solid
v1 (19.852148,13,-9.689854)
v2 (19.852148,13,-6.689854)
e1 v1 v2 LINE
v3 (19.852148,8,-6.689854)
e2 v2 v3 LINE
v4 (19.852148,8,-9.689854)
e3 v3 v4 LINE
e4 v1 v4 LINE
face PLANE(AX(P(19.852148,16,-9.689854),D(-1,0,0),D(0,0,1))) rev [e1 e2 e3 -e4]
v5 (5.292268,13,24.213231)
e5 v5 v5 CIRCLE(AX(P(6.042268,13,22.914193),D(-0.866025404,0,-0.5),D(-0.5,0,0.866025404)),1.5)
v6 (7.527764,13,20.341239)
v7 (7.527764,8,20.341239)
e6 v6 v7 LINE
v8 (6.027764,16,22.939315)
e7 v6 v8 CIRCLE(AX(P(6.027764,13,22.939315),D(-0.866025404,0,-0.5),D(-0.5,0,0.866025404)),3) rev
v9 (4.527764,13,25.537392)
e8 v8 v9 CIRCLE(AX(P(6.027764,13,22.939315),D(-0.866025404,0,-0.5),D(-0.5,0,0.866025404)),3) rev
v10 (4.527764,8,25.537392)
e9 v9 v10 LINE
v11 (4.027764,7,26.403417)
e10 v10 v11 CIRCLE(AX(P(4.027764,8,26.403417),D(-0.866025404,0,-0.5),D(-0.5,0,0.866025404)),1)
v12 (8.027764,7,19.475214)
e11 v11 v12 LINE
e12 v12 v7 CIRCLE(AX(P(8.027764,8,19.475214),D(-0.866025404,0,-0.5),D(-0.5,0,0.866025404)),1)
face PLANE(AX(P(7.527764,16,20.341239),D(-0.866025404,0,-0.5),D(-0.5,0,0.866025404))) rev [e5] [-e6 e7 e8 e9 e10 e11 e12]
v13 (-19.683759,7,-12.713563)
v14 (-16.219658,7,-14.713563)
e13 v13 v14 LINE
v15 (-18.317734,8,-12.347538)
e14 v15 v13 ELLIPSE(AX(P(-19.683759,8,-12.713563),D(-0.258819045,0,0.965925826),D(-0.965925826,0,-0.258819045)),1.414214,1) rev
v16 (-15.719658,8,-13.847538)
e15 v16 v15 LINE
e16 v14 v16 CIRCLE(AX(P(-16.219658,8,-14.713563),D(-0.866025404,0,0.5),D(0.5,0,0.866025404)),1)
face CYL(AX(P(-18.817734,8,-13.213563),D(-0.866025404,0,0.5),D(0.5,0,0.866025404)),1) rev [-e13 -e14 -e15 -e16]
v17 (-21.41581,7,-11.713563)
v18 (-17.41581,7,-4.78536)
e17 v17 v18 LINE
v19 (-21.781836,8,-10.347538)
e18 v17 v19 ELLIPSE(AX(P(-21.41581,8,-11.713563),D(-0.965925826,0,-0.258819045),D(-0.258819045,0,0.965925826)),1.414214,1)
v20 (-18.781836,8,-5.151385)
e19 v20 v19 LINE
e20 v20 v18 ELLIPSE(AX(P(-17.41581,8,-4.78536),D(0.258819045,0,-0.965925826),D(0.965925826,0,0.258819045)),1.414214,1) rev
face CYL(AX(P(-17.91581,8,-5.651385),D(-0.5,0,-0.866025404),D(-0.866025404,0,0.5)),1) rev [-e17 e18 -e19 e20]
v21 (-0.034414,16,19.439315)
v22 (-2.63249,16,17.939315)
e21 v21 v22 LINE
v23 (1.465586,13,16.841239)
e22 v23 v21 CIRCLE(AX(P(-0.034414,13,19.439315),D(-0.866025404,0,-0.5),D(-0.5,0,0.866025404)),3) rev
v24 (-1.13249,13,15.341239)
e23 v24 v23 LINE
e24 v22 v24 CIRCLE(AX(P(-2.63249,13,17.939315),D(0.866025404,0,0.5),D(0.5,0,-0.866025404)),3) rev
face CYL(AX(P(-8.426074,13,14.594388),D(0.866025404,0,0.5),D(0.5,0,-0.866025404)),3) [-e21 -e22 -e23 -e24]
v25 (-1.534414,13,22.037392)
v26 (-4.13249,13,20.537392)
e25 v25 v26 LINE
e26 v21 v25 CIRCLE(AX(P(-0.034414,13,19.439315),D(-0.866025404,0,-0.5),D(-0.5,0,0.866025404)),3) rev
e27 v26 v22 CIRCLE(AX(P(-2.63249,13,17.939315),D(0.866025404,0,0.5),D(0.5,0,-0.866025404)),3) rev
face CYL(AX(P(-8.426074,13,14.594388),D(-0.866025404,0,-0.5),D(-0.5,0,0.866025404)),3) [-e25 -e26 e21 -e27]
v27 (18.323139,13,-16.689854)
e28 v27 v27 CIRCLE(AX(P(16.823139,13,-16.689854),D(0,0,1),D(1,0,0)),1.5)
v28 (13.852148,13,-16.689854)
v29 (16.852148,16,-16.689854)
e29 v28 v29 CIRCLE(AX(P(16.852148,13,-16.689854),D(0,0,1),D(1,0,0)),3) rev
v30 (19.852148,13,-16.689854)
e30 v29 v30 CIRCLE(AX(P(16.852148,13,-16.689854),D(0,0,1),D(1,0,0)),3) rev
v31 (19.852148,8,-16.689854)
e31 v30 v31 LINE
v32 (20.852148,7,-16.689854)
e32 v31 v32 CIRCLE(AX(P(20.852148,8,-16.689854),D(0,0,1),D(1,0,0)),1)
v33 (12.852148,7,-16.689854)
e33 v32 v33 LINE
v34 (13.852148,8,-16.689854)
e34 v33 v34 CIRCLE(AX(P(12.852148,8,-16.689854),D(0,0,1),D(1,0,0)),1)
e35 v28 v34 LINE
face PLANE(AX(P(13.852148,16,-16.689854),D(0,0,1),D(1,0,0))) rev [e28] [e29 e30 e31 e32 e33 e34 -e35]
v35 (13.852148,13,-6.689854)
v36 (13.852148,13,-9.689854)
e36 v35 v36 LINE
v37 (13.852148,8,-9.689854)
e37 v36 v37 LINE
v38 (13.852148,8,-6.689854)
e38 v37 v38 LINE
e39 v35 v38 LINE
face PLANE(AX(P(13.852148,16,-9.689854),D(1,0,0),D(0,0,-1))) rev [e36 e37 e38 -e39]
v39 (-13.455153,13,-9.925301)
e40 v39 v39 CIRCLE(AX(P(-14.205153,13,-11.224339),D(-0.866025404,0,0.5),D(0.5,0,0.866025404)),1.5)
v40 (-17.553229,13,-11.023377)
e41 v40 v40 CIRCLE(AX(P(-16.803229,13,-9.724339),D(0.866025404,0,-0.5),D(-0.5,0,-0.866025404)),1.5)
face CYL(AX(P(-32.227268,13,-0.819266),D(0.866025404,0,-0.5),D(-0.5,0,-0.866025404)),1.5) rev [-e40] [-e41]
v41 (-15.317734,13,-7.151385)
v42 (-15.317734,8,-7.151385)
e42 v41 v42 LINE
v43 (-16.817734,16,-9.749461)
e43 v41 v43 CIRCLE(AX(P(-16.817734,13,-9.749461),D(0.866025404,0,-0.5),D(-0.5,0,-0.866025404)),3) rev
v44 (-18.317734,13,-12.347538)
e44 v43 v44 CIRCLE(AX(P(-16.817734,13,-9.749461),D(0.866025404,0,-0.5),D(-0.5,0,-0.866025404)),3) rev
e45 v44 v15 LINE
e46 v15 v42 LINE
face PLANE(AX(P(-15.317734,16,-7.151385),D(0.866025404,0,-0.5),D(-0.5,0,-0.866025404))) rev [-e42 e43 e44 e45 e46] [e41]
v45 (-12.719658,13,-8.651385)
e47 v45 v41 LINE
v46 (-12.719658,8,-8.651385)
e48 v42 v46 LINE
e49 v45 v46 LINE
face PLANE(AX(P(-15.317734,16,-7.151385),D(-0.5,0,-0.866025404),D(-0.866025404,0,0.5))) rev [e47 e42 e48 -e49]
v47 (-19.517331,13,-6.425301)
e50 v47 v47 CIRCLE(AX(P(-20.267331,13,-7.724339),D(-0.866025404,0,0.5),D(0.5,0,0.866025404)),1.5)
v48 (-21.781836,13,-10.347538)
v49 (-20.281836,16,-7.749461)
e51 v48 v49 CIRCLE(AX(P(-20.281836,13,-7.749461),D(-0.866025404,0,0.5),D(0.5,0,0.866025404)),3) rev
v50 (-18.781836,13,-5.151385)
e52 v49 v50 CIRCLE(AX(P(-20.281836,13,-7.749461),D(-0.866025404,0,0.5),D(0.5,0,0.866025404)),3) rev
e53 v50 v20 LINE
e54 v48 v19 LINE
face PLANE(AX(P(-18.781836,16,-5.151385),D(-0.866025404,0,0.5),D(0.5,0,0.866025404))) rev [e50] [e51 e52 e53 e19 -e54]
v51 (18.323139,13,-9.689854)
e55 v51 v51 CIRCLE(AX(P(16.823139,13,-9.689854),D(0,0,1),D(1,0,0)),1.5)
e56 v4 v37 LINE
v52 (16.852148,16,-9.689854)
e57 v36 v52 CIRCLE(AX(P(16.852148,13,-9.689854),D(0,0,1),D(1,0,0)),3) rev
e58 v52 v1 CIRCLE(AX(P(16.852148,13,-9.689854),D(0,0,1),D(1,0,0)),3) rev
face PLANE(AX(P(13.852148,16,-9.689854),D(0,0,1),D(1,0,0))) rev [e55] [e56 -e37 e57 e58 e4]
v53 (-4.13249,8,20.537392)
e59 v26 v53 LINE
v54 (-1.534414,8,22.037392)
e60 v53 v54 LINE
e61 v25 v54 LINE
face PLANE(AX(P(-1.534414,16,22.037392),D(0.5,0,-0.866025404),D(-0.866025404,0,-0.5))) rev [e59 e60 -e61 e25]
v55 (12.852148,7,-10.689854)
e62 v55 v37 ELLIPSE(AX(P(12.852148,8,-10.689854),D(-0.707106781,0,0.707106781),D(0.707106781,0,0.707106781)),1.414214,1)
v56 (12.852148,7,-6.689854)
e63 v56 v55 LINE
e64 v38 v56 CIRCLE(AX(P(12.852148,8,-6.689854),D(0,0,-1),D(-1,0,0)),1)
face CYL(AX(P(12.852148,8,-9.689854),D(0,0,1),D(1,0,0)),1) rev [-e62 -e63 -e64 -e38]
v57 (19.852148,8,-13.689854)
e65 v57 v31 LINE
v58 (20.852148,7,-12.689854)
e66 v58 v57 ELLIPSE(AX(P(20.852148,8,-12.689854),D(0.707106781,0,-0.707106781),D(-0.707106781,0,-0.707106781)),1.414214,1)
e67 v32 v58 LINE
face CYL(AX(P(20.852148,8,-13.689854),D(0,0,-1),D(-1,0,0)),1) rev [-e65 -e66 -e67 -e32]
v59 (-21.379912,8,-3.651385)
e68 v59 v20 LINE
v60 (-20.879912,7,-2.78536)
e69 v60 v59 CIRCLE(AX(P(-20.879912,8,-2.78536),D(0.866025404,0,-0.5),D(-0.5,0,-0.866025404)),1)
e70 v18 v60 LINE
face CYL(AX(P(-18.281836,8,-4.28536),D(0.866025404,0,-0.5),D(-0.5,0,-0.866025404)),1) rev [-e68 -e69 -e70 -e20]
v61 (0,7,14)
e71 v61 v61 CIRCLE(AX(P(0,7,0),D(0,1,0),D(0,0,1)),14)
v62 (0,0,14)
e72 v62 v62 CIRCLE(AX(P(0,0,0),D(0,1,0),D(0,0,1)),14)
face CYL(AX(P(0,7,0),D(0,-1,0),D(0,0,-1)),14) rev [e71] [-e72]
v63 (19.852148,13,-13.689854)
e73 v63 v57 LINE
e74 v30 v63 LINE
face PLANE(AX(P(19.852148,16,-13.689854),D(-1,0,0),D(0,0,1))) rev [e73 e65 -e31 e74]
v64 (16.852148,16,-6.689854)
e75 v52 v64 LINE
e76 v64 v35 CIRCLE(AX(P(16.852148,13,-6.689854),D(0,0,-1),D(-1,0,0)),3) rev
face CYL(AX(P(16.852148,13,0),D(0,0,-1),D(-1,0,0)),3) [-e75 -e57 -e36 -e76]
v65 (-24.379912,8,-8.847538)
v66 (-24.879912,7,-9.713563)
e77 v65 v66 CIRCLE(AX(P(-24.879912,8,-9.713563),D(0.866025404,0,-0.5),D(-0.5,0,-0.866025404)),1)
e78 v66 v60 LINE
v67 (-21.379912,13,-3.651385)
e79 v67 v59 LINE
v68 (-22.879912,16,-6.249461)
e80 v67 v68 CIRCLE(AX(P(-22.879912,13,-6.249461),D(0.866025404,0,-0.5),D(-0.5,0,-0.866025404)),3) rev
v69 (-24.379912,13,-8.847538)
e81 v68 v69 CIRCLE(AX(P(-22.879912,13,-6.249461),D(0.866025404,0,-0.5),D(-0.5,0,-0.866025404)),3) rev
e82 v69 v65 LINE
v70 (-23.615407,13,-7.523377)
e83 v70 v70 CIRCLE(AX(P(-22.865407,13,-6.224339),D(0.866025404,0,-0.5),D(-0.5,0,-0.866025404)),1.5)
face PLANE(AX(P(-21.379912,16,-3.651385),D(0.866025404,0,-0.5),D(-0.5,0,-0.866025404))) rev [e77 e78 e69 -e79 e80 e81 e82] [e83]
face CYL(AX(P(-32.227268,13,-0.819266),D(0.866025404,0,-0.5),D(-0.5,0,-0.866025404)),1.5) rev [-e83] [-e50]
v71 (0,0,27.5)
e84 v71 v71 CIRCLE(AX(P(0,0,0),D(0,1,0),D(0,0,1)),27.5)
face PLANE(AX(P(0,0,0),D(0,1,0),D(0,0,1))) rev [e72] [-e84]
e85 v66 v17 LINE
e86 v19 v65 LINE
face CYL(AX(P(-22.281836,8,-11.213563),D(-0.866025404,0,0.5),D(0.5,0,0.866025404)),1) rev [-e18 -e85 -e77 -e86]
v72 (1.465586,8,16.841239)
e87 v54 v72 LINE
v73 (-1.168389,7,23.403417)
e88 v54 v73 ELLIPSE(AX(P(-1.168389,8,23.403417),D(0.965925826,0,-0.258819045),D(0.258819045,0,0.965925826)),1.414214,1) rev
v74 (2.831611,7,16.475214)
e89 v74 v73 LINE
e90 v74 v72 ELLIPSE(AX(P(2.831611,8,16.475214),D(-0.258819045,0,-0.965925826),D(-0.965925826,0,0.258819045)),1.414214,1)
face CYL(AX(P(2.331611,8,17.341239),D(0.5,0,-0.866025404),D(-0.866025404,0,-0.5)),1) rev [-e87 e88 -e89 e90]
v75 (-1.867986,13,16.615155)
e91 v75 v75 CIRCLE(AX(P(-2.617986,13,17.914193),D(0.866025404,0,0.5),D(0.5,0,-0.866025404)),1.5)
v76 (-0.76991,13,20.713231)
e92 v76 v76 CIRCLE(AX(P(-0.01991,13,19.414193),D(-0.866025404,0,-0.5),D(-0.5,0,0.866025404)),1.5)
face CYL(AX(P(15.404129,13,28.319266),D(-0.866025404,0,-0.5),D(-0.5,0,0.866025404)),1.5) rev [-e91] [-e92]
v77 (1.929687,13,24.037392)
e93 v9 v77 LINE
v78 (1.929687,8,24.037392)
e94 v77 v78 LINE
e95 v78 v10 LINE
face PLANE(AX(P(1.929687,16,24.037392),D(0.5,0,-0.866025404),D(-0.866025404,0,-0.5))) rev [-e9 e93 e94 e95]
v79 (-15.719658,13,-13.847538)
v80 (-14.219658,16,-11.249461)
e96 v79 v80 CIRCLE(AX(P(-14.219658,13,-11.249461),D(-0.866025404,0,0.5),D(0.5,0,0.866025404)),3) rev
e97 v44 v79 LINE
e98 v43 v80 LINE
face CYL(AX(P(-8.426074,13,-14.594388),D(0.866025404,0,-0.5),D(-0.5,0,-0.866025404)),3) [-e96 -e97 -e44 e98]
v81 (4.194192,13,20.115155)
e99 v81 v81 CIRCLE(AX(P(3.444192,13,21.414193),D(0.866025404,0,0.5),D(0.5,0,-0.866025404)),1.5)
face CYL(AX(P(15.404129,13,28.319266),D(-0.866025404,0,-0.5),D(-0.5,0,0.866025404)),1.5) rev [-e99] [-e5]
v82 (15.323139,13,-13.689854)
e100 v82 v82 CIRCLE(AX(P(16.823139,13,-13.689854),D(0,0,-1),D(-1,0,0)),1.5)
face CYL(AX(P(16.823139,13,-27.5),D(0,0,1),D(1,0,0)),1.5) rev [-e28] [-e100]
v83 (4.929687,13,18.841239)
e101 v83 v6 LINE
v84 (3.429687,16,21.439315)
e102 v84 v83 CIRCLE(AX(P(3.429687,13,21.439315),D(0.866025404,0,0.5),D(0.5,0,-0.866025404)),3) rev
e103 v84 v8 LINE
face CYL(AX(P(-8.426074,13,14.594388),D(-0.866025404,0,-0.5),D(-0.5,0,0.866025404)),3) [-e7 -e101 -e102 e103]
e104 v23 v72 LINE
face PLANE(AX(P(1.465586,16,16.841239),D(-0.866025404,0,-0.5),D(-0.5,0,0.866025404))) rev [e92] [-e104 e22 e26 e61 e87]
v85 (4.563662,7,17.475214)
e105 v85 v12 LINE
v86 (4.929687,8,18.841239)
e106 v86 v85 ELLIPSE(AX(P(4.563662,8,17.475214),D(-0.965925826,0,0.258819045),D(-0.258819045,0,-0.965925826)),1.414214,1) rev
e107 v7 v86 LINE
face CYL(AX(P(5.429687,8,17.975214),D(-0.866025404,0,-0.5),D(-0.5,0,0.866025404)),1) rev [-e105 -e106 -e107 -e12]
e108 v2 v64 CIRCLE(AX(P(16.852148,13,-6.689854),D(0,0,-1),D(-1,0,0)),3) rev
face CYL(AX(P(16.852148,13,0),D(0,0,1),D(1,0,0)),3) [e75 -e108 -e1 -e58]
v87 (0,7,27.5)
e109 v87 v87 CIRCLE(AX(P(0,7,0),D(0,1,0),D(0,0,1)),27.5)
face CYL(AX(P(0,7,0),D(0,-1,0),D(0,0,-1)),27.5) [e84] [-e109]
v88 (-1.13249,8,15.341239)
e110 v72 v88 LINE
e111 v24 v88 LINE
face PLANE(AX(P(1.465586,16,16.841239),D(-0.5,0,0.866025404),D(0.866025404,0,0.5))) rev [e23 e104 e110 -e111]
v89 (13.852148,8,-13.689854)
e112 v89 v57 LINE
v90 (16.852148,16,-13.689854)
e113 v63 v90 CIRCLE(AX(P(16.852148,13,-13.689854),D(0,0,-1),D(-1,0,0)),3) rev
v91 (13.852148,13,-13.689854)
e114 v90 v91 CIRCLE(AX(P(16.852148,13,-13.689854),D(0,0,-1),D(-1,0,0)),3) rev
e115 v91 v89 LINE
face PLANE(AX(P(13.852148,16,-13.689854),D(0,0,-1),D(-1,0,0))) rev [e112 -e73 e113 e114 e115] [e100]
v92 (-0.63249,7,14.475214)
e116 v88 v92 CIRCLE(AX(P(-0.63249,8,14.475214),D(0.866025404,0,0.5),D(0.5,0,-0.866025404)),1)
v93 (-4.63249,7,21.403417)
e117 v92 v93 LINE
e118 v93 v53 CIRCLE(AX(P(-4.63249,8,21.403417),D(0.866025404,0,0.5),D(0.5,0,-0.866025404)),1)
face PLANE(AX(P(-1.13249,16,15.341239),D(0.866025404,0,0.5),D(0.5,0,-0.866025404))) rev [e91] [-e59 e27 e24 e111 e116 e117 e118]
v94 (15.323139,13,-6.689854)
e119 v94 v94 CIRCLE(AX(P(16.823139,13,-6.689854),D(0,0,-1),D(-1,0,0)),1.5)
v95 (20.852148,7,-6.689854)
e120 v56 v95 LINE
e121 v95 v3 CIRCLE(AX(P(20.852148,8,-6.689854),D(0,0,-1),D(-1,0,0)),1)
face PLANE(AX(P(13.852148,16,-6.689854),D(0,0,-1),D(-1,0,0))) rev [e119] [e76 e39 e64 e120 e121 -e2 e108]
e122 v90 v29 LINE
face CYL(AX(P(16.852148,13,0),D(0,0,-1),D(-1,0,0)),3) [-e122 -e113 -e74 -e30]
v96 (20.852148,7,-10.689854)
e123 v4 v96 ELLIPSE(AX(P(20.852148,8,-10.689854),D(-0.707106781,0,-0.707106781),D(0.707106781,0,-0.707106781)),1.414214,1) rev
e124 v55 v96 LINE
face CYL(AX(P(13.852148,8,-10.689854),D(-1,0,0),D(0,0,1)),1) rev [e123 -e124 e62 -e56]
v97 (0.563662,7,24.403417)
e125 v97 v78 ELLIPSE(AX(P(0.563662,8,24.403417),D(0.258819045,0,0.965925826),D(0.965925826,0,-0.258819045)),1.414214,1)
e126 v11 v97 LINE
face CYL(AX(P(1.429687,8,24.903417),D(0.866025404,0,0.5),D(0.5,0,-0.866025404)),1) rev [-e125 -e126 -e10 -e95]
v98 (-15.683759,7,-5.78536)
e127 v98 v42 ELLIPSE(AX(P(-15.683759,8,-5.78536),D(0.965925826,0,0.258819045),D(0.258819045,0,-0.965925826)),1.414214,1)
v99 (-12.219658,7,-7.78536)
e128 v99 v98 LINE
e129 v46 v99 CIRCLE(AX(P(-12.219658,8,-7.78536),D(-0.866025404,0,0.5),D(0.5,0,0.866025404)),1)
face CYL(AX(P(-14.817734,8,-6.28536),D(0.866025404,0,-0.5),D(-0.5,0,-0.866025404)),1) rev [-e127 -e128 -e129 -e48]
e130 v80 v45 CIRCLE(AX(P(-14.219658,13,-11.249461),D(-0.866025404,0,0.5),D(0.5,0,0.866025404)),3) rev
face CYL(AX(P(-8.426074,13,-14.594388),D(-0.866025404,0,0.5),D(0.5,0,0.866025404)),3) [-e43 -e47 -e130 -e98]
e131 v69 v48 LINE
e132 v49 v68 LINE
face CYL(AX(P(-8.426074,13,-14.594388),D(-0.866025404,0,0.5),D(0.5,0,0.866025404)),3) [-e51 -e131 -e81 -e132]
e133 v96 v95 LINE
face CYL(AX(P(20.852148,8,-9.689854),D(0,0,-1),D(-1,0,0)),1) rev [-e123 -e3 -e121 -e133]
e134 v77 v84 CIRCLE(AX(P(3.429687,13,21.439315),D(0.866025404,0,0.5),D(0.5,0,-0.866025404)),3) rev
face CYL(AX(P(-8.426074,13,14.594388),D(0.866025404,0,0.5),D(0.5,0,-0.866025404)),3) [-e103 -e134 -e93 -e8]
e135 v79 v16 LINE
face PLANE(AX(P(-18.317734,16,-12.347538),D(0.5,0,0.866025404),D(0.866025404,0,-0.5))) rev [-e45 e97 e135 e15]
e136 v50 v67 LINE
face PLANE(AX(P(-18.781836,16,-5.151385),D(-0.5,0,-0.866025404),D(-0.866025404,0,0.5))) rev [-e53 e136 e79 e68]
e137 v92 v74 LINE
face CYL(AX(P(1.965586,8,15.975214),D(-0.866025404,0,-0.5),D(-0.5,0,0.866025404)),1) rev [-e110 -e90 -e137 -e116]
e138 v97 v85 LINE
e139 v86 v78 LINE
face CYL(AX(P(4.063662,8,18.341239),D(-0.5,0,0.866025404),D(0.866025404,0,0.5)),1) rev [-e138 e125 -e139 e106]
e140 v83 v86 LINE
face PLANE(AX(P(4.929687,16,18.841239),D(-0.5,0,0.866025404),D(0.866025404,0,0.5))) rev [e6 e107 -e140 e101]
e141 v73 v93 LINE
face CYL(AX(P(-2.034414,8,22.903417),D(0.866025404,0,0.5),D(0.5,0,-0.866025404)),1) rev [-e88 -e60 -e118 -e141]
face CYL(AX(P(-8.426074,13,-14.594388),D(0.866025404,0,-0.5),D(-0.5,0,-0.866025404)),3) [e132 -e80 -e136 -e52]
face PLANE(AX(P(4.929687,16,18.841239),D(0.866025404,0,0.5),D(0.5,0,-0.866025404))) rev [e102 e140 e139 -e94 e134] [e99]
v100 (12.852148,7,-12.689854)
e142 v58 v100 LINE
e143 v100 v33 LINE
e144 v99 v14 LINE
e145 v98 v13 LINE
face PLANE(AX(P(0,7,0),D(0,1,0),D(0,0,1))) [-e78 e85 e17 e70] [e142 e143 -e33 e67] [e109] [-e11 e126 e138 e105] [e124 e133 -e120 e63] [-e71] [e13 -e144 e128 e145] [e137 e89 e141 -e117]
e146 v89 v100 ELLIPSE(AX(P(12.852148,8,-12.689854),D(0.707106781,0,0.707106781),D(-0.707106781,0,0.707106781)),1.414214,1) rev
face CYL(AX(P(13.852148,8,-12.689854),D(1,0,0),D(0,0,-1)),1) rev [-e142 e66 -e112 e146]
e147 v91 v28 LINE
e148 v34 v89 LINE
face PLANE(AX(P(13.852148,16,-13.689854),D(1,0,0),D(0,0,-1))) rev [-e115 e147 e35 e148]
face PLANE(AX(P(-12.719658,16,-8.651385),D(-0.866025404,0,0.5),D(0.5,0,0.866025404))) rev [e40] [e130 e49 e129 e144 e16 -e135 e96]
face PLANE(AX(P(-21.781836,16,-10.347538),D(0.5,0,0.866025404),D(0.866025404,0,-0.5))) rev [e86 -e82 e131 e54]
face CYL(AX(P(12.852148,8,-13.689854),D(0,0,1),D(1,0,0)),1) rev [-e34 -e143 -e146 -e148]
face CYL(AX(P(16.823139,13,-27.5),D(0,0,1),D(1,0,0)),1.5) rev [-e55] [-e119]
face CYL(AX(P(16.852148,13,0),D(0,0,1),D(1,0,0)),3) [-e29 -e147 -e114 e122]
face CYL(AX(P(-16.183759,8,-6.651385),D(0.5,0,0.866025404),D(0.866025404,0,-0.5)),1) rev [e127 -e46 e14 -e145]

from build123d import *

# Parameters (mm, degrees)
SKETCH1_R                = 27.5
SKETCH1_R_2              = 14
BOSS_EXTRUDE1_DEPTH      = 7
SKETCH3_W                = 6
SKETCH3_H                = 3
BOSS_EXTRUDE2_DEPTH      = 9
FILLET1_R                = 3
FILLET2_R                = 1
SKETCH5_R                = 1.5
CUT_EXTRUDE2_DEPTH       = 47.703277471
CIRPATTERN2_COUNT        = 3
FILLET1_OF_CIRPATTERN2_R = 3
FILLET2_OF_CIRPATTERN2_R = 1


with BuildPart() as part:
    # Sketch1 → Boss-Extrude1 (new body)
    with BuildSketch(Plane(origin=(0, 0, 0), x_dir=(1, 0, 0), z_dir=(0, 1, 0))):
        with Locations(Location((0, 0, 0), (0, 0, 270))):
            Circle(SKETCH1_R)
        with Locations(Location((0, 0, 0), (0, 0, 270))):
            Circle(SKETCH1_R_2, mode=Mode.SUBTRACT)
    extrude(amount=BOSS_EXTRUDE1_DEPTH)

    # Sketch3 → Boss-Extrude2 (add)
    with BuildSketch(Plane(origin=(0, 7, 0), x_dir=(1, 0, 0), z_dir=(0, 1, 0))):
        with Locations((16.852148123, 8.189854147)):
            Rectangle(SKETCH3_W, SKETCH3_H)
        with Locations((16.852148123, 15.189854147)):
            Rectangle(SKETCH3_W, SKETCH3_H)
    boss_extrude2 = extrude(amount=BOSS_EXTRUDE2_DEPTH)

    # Fillet1
    fillet1_edges = [part.edges().sort_by_distance(p)[0] for p in [
        (19.852148123, 16, -8.189854147),
        (13.852148123, 16, -8.189854147),
        (13.852148123, 16, -15.189854147),
        (19.852148123, 16, -15.189854147),
    ]]
    fillet(fillet1_edges, radius=FILLET1_R - 0.0001)  # a hair under: the kernel refuses the full size

    # Fillet2
    fillet2_edges = [part.edges().sort_by_distance(p)[0] for p in [
        (19.852148123, 7, -8.189854147),
        (16.852148123, 7, -9.689854147),
        (13.852148123, 7, -8.189854147),
        (19.852148123, 7, -15.189854147),
        (13.852148123, 7, -15.189854147),
        (16.852148123, 7, -13.689854147),
    ]]
    fillet(fillet2_edges, radius=FILLET2_R)

    # Sketch5 → Cut-Extrude2 (cut, symmetric)
    with BuildSketch(Plane.XY.offset(-6.689854147)):
        with Locations((16.823138997, 13)):
            Circle(SKETCH5_R)
    cut_extrude2 = extrude(amount=CUT_EXTRUDE2_DEPTH, both=True, mode=Mode.SUBTRACT)

    # CirPattern2: Boss-Extrude2, Cut-Extrude2 ×3 about axis
    cirpattern2_axis = Axis((0, 0, 0), (0, 1, 0))
    add([boss_extrude2.rotate(cirpattern2_axis, i * 360 / CIRPATTERN2_COUNT) for i in range(1, CIRPATTERN2_COUNT)])
    add([cut_extrude2.rotate(cirpattern2_axis, i * 360 / CIRPATTERN2_COUNT) for i in range(1, CIRPATTERN2_COUNT)], mode=Mode.SUBTRACT)

    # Fillet1 of CirPattern2
    fillet1_of_cirpattern2_edges = [part.edges().sort_by_distance(p)[0] for p in [
        (-17.018695806, 16, -13.097537521),
        (-14.018695806, 16, -7.901385098),
        (-20.080873632, 16, -4.401385098),
        (-23.080873632, 16, -9.597537521),
        (-2.833452317, 16, 21.287391668),
        (0.166547683, 16, 16.091239245),
        (6.228725509, 16, 19.591239245),
        (3.228725509, 16, 24.787391668),
    ]]
    fillet(fillet1_of_cirpattern2_edges, radius=FILLET1_OF_CIRPATTERN2_R - 0.0001)  # a hair under: the kernel refuses the full size

    # Fillet2 of CirPattern2
    fillet2_of_cirpattern2_edges = [part.edges().sort_by_distance(p)[0] for p in [
        (-17.018695806, 7, -13.097537521),
        (-16.817733912, 7, -9.749461309),
        (-14.018695806, 7, -7.901385098),
        (-23.080873632, 7, -9.597537521),
        (-20.080873632, 7, -4.401385098),
        (-20.281835527, 7, -7.749461309),
        (-2.833452317, 7, 21.287391668),
        (-0.034414211, 7, 19.439315456),
        (0.166547683, 7, 16.091239245),
        (3.228725509, 7, 24.787391668),
        (6.228725509, 7, 19.591239245),
        (3.429687404, 7, 21.439315456),
    ]]
    fillet(fillet2_of_cirpattern2_edges, radius=FILLET2_OF_CIRPATTERN2_R)


solid = part.part
